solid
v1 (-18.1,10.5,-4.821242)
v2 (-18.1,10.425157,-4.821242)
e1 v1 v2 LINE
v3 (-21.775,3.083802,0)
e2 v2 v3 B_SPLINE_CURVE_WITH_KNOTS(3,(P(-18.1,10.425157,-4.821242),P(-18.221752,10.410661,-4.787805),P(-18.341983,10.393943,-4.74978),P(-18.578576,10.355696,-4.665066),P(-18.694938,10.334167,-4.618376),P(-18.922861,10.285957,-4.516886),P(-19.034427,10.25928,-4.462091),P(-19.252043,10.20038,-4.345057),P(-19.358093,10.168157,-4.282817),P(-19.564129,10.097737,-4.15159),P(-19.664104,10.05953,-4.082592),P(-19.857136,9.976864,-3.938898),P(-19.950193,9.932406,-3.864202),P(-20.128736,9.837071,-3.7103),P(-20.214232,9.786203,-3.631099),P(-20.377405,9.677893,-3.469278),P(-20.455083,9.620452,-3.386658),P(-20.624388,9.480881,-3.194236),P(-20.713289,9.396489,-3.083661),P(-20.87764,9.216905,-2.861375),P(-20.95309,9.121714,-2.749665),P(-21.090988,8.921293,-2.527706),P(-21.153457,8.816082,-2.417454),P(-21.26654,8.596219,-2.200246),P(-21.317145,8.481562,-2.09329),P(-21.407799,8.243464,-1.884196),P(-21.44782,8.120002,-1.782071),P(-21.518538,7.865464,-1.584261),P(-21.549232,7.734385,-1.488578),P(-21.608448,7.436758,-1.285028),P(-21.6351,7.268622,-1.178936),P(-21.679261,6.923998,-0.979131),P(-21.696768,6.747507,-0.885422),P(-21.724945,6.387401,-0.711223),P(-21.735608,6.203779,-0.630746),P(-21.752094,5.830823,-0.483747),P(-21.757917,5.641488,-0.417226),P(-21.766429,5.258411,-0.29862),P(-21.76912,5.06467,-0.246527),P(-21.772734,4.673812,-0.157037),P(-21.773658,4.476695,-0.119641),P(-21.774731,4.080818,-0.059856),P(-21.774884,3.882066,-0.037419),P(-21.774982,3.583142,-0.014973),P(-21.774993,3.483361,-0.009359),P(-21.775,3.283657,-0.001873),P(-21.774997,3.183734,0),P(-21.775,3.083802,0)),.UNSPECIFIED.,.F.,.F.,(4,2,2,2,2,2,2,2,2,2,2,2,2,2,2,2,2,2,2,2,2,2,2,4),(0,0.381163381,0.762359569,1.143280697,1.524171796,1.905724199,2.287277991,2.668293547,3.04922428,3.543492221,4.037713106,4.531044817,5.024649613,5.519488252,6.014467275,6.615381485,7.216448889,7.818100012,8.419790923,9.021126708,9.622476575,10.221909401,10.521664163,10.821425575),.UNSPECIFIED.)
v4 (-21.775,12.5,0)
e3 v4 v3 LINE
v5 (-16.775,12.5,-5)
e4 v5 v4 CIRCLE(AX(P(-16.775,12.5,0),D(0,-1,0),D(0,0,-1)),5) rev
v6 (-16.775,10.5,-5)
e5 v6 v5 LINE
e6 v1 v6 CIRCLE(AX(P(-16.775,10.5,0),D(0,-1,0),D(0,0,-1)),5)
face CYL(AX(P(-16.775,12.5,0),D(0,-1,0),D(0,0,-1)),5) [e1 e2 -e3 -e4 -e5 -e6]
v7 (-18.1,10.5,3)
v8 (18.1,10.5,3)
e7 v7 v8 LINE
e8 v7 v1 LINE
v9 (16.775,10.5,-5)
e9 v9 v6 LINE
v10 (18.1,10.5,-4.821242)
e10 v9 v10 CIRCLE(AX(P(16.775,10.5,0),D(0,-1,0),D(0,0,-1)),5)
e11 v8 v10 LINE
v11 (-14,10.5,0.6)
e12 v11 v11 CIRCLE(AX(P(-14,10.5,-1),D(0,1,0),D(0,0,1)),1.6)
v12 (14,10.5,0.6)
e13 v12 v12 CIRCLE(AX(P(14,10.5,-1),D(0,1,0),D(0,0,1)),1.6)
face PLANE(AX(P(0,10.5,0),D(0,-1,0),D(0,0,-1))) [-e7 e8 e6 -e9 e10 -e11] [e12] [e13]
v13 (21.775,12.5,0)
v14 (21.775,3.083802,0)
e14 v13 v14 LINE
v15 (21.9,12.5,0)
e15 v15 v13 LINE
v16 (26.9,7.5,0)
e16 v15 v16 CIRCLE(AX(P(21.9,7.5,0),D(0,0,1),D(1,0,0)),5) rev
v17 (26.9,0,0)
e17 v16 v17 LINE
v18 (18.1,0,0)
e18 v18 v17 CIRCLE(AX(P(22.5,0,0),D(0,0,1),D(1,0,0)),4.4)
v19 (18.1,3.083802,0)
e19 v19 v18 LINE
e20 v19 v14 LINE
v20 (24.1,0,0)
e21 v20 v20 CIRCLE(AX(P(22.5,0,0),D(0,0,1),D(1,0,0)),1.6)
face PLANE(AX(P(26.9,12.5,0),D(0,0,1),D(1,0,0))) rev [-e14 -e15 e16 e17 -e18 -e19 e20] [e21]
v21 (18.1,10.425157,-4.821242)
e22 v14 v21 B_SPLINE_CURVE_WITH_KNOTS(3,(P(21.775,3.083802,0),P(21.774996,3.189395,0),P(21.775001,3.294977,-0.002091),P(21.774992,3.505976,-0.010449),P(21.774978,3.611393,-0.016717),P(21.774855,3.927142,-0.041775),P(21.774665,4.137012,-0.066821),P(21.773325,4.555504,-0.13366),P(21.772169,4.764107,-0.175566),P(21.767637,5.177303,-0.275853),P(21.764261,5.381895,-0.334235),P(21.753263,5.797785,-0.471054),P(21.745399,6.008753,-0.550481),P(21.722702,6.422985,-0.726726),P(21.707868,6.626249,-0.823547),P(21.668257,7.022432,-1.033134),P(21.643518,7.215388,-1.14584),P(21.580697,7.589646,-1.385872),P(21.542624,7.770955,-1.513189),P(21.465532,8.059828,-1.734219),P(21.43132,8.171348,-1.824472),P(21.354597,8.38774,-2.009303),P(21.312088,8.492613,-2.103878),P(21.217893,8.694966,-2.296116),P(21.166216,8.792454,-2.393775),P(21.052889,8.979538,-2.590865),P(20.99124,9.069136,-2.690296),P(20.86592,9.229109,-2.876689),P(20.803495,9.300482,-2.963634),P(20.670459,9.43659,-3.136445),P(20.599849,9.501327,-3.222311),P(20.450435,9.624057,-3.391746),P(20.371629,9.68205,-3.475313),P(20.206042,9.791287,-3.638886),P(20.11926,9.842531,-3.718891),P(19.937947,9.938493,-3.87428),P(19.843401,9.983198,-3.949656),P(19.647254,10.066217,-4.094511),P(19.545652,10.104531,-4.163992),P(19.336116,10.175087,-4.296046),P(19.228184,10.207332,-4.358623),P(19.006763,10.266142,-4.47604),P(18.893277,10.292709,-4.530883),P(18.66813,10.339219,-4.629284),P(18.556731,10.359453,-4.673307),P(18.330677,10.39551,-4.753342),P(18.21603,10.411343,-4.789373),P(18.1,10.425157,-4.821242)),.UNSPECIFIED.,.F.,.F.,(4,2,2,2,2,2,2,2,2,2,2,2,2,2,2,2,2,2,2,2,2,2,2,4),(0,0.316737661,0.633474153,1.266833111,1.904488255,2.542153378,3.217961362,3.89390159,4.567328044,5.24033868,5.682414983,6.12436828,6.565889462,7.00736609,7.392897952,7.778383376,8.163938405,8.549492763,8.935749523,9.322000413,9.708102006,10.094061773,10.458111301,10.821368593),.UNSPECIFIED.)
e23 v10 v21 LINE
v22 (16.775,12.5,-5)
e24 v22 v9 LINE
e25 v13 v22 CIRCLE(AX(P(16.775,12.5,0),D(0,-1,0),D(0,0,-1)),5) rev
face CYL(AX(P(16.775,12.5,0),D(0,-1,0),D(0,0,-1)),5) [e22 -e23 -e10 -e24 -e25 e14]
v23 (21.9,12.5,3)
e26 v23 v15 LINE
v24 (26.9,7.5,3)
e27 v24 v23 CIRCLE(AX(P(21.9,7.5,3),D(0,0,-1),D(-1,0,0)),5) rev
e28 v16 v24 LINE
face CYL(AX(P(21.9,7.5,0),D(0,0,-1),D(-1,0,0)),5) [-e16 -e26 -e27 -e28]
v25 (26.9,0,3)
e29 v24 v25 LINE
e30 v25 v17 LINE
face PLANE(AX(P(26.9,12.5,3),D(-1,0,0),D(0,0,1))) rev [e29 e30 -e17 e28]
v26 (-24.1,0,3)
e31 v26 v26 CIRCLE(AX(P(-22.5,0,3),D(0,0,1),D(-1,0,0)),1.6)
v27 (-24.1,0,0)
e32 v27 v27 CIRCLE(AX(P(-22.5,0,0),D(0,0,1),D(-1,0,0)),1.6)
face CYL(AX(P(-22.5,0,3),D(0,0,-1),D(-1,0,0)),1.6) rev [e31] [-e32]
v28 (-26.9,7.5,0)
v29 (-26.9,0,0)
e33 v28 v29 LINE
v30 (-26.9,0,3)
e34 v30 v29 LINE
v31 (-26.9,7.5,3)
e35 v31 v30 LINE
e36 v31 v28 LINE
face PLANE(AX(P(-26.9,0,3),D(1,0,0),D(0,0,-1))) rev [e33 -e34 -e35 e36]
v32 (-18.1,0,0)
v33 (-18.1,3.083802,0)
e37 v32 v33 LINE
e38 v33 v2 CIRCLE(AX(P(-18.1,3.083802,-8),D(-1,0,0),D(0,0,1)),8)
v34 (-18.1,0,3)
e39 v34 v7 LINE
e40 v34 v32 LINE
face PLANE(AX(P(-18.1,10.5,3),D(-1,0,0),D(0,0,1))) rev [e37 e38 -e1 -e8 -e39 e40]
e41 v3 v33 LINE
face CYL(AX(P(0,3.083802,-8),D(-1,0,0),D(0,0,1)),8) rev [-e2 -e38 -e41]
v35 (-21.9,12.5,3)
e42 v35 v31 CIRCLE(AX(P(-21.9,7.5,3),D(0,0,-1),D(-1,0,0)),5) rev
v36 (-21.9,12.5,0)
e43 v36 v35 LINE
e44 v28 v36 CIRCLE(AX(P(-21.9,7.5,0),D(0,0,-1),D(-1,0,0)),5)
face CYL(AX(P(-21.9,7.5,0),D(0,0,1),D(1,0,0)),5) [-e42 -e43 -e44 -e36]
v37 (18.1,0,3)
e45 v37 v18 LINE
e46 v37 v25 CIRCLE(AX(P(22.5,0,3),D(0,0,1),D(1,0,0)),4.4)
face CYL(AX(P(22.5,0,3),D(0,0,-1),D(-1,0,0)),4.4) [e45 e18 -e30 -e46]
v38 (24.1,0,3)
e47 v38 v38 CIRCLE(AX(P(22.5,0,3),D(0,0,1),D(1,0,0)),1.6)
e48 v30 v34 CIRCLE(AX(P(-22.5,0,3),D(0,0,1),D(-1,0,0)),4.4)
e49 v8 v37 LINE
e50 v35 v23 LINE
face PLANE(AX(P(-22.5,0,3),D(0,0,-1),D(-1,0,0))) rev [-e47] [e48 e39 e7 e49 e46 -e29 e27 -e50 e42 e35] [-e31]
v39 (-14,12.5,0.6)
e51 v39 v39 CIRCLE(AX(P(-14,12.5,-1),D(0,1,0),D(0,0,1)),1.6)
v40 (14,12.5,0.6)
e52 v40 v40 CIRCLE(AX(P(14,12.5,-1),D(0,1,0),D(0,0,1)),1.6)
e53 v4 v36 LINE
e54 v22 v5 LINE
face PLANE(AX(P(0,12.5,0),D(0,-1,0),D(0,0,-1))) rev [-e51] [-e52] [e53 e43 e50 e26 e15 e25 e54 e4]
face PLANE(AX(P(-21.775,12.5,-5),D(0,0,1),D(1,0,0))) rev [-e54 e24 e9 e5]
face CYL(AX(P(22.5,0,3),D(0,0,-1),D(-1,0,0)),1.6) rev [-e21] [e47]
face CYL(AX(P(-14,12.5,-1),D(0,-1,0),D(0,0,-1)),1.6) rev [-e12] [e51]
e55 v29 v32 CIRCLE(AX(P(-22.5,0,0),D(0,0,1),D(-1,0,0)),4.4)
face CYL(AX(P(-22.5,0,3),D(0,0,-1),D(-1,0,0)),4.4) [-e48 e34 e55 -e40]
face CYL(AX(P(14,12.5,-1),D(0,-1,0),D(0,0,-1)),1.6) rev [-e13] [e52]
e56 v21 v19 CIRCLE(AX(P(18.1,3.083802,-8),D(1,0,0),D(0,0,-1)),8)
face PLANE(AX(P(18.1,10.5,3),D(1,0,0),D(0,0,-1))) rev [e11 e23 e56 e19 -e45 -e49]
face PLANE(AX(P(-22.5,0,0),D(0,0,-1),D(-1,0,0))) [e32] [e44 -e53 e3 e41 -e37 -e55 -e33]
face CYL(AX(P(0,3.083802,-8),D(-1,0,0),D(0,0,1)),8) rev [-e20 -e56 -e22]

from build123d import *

# Parameters (mm, degrees)
SKETCH_1_R           = 4.4
SKETCH_1_R_2         = 1.6
EXTRUDE_1_DEPTH      = 3
EXTRUDE_1_2_DEPTH    = 3
EXTRUDE_2_DEPTH      = 3
SKETCH_3_R           = 1.6
EXTRUDE_3_DEPTH      = 2
FILLET_1_R           = 5
FILLET_START         = 10.425156935
FILLET_2_DEPTH       = 2.074843065
FILLET_START_2       = 3.083801413
FILLET_2_2_DEPTH     = 7.341355522
FILLET_2_3_OUTLINE_W = 8
FILLET_2_3_OUTLINE_H = 3.675


with BuildPart() as part:
    # 草图1 → 凸台-拉伸1 (new body)
    with BuildSketch(Plane.XY):
        with Locations(Location((-22.5, 0, 0), (0, 0, 180))):
            Circle(SKETCH_1_R)
        with Locations(Location((-22.5, 0, 0), (0, 0, 180))):
            Circle(SKETCH_1_R_2, mode=Mode.SUBTRACT)
    extrude(amount=EXTRUDE_1_DEPTH)



with BuildPart() as body_2:
    # 草图1 → Extrude 1 2 (new body)
    with BuildSketch(Plane.XY):
        with Locations((22.5, 0)):
            Circle(SKETCH_1_R)
        with Locations((22.5, 0)):
            Circle(SKETCH_1_R_2, mode=Mode.SUBTRACT)
    extrude(amount=EXTRUDE_1_2_DEPTH)


with BuildPart() as part_1:
    add(part.part)

    add(body_2.part)  # 凸台-拉伸2 merges body 2
    # 草图2 → 凸台-拉伸2 (add)
    with BuildSketch(Plane.XY):
        with BuildLine():
            Line((-26.9, 0), (-26.9, 10.5))
            Line((-26.9, 10.5), (-18.1, 10.5))
            Line((-18.1, 10.5), (-18.1, 0))
            ThreePointArc((-18.1, 0), (-22.5, 4.4), (-26.9, 0))
        make_face()
        with BuildLine():
            Line((18.1, 10.5), (18.1, 0))
            ThreePointArc((18.1, 0), (22.5, 4.4), (26.9, 0))
            Line((26.9, 0), (26.9, 10.5))
            Line((26.9, 10.5), (18.1, 10.5))
        make_face()
    extrude(amount=EXTRUDE_2_DEPTH)

    # 草图3 → 凸台-拉伸3 (add)
    with BuildSketch(Plane(origin=(0, 10.5, 0), x_dir=(1, 0, 0), z_dir=(0, 1, 0))):
        Polygon((-12.220864979, -3), (12.220864979, -3), (26.9, -3), (26.9, 0), (21.775, 0), (21.775, 5), (-21.775, 5), (-21.775, 0), (-26.9, 0), (-26.9, -3), align=None)
        with Locations(Location((14, 1, 0), (0, 0, 270))):
            Circle(SKETCH_3_R, mode=Mode.SUBTRACT)
        with Locations(Location((-14, 1, 0), (0, 0, 270))):
            Circle(SKETCH_3_R, mode=Mode.SUBTRACT)
    extrude(amount=EXTRUDE_3_DEPTH)

    # 圆角1
    fillet_1_edges = [part_1.edges().sort_by_distance(p)[0] for p in [
        (26.9, 12.5, 1.5),
        (-26.9, 12.5, 1.5),
        (-21.775, 11.5, -5),
        (21.775, 11.5, -5),
    ]]
    fillet(fillet_1_edges, radius=FILLET_1_R - 0.0001)  # a hair under: the kernel refuses the full size

    # 圆角2: read off the stored shape, not the designer's step
    # 圆角2 outline → 圆角2 (add)
    with BuildSketch(Plane(origin=(0, 0, 0), x_dir=(1, 0, 0), z_dir=(0, 1, 0)).offset(FILLET_START)):
        with BuildLine():
            Line((-18.1, 0), (-18.1, 4.82124206))
            ThreePointArc((-18.1, 4.82124206), (-20.75149343, 3.031088913), (-21.775, 0))
            Line((-21.775, 0), (-18.1, 0))
        make_face()
        with BuildLine():
            Line((18.1, 4.82124206), (18.1, 0))
            Line((18.1, 0), (21.775, 0))
            ThreePointArc((21.775, 0), (20.75149343, 3.031088913), (18.1, 4.82124206))
        make_face()
    extrude(amount=FILLET_2_DEPTH)

    # Fillet 2 2 outline → Fillet 2 2 (add)
    with BuildSketch(Plane(origin=(0, 0, 0), x_dir=(1, 0, 0), z_dir=(0, 1, 0)).offset(FILLET_START_2)):
        with BuildLine():
            Line((-18.1, 0), (-18.1, 4.82124206))
            ThreePointArc((-18.1, 4.82124206), (-20.75149343, 3.031088913), (-21.775, 0))
            Line((-21.775, 0), (-18.1, 0))
        make_face()
        with BuildLine():
            Line((18.1, 4.82124206), (18.1, 0))
            Line((18.1, 0), (21.775, 0))
            ThreePointArc((21.775, 0), (20.75149343, 3.031088913), (18.1, 4.82124206))
        make_face()
    extrude(amount=FILLET_2_2_DEPTH)

    # Fillet 2 3 outline → Fillet 2 3 (revolve, cut)
    with BuildSketch(Plane(origin=(0, 3.083801513, -8), x_dir=(0, 1, 0), z_dir=(0, 0, -1))):
        with Locations((4, -19.9375)):
            Rectangle(FILLET_2_3_OUTLINE_W, FILLET_2_3_OUTLINE_H)
        with Locations((4, 19.9375)):
            Rectangle(FILLET_2_3_OUTLINE_W, FILLET_2_3_OUTLINE_H)
    revolve(axis=Axis((0, 3.083801513, -8), (1, 0, 0)), mode=Mode.SUBTRACT)


solid = part_1.part
